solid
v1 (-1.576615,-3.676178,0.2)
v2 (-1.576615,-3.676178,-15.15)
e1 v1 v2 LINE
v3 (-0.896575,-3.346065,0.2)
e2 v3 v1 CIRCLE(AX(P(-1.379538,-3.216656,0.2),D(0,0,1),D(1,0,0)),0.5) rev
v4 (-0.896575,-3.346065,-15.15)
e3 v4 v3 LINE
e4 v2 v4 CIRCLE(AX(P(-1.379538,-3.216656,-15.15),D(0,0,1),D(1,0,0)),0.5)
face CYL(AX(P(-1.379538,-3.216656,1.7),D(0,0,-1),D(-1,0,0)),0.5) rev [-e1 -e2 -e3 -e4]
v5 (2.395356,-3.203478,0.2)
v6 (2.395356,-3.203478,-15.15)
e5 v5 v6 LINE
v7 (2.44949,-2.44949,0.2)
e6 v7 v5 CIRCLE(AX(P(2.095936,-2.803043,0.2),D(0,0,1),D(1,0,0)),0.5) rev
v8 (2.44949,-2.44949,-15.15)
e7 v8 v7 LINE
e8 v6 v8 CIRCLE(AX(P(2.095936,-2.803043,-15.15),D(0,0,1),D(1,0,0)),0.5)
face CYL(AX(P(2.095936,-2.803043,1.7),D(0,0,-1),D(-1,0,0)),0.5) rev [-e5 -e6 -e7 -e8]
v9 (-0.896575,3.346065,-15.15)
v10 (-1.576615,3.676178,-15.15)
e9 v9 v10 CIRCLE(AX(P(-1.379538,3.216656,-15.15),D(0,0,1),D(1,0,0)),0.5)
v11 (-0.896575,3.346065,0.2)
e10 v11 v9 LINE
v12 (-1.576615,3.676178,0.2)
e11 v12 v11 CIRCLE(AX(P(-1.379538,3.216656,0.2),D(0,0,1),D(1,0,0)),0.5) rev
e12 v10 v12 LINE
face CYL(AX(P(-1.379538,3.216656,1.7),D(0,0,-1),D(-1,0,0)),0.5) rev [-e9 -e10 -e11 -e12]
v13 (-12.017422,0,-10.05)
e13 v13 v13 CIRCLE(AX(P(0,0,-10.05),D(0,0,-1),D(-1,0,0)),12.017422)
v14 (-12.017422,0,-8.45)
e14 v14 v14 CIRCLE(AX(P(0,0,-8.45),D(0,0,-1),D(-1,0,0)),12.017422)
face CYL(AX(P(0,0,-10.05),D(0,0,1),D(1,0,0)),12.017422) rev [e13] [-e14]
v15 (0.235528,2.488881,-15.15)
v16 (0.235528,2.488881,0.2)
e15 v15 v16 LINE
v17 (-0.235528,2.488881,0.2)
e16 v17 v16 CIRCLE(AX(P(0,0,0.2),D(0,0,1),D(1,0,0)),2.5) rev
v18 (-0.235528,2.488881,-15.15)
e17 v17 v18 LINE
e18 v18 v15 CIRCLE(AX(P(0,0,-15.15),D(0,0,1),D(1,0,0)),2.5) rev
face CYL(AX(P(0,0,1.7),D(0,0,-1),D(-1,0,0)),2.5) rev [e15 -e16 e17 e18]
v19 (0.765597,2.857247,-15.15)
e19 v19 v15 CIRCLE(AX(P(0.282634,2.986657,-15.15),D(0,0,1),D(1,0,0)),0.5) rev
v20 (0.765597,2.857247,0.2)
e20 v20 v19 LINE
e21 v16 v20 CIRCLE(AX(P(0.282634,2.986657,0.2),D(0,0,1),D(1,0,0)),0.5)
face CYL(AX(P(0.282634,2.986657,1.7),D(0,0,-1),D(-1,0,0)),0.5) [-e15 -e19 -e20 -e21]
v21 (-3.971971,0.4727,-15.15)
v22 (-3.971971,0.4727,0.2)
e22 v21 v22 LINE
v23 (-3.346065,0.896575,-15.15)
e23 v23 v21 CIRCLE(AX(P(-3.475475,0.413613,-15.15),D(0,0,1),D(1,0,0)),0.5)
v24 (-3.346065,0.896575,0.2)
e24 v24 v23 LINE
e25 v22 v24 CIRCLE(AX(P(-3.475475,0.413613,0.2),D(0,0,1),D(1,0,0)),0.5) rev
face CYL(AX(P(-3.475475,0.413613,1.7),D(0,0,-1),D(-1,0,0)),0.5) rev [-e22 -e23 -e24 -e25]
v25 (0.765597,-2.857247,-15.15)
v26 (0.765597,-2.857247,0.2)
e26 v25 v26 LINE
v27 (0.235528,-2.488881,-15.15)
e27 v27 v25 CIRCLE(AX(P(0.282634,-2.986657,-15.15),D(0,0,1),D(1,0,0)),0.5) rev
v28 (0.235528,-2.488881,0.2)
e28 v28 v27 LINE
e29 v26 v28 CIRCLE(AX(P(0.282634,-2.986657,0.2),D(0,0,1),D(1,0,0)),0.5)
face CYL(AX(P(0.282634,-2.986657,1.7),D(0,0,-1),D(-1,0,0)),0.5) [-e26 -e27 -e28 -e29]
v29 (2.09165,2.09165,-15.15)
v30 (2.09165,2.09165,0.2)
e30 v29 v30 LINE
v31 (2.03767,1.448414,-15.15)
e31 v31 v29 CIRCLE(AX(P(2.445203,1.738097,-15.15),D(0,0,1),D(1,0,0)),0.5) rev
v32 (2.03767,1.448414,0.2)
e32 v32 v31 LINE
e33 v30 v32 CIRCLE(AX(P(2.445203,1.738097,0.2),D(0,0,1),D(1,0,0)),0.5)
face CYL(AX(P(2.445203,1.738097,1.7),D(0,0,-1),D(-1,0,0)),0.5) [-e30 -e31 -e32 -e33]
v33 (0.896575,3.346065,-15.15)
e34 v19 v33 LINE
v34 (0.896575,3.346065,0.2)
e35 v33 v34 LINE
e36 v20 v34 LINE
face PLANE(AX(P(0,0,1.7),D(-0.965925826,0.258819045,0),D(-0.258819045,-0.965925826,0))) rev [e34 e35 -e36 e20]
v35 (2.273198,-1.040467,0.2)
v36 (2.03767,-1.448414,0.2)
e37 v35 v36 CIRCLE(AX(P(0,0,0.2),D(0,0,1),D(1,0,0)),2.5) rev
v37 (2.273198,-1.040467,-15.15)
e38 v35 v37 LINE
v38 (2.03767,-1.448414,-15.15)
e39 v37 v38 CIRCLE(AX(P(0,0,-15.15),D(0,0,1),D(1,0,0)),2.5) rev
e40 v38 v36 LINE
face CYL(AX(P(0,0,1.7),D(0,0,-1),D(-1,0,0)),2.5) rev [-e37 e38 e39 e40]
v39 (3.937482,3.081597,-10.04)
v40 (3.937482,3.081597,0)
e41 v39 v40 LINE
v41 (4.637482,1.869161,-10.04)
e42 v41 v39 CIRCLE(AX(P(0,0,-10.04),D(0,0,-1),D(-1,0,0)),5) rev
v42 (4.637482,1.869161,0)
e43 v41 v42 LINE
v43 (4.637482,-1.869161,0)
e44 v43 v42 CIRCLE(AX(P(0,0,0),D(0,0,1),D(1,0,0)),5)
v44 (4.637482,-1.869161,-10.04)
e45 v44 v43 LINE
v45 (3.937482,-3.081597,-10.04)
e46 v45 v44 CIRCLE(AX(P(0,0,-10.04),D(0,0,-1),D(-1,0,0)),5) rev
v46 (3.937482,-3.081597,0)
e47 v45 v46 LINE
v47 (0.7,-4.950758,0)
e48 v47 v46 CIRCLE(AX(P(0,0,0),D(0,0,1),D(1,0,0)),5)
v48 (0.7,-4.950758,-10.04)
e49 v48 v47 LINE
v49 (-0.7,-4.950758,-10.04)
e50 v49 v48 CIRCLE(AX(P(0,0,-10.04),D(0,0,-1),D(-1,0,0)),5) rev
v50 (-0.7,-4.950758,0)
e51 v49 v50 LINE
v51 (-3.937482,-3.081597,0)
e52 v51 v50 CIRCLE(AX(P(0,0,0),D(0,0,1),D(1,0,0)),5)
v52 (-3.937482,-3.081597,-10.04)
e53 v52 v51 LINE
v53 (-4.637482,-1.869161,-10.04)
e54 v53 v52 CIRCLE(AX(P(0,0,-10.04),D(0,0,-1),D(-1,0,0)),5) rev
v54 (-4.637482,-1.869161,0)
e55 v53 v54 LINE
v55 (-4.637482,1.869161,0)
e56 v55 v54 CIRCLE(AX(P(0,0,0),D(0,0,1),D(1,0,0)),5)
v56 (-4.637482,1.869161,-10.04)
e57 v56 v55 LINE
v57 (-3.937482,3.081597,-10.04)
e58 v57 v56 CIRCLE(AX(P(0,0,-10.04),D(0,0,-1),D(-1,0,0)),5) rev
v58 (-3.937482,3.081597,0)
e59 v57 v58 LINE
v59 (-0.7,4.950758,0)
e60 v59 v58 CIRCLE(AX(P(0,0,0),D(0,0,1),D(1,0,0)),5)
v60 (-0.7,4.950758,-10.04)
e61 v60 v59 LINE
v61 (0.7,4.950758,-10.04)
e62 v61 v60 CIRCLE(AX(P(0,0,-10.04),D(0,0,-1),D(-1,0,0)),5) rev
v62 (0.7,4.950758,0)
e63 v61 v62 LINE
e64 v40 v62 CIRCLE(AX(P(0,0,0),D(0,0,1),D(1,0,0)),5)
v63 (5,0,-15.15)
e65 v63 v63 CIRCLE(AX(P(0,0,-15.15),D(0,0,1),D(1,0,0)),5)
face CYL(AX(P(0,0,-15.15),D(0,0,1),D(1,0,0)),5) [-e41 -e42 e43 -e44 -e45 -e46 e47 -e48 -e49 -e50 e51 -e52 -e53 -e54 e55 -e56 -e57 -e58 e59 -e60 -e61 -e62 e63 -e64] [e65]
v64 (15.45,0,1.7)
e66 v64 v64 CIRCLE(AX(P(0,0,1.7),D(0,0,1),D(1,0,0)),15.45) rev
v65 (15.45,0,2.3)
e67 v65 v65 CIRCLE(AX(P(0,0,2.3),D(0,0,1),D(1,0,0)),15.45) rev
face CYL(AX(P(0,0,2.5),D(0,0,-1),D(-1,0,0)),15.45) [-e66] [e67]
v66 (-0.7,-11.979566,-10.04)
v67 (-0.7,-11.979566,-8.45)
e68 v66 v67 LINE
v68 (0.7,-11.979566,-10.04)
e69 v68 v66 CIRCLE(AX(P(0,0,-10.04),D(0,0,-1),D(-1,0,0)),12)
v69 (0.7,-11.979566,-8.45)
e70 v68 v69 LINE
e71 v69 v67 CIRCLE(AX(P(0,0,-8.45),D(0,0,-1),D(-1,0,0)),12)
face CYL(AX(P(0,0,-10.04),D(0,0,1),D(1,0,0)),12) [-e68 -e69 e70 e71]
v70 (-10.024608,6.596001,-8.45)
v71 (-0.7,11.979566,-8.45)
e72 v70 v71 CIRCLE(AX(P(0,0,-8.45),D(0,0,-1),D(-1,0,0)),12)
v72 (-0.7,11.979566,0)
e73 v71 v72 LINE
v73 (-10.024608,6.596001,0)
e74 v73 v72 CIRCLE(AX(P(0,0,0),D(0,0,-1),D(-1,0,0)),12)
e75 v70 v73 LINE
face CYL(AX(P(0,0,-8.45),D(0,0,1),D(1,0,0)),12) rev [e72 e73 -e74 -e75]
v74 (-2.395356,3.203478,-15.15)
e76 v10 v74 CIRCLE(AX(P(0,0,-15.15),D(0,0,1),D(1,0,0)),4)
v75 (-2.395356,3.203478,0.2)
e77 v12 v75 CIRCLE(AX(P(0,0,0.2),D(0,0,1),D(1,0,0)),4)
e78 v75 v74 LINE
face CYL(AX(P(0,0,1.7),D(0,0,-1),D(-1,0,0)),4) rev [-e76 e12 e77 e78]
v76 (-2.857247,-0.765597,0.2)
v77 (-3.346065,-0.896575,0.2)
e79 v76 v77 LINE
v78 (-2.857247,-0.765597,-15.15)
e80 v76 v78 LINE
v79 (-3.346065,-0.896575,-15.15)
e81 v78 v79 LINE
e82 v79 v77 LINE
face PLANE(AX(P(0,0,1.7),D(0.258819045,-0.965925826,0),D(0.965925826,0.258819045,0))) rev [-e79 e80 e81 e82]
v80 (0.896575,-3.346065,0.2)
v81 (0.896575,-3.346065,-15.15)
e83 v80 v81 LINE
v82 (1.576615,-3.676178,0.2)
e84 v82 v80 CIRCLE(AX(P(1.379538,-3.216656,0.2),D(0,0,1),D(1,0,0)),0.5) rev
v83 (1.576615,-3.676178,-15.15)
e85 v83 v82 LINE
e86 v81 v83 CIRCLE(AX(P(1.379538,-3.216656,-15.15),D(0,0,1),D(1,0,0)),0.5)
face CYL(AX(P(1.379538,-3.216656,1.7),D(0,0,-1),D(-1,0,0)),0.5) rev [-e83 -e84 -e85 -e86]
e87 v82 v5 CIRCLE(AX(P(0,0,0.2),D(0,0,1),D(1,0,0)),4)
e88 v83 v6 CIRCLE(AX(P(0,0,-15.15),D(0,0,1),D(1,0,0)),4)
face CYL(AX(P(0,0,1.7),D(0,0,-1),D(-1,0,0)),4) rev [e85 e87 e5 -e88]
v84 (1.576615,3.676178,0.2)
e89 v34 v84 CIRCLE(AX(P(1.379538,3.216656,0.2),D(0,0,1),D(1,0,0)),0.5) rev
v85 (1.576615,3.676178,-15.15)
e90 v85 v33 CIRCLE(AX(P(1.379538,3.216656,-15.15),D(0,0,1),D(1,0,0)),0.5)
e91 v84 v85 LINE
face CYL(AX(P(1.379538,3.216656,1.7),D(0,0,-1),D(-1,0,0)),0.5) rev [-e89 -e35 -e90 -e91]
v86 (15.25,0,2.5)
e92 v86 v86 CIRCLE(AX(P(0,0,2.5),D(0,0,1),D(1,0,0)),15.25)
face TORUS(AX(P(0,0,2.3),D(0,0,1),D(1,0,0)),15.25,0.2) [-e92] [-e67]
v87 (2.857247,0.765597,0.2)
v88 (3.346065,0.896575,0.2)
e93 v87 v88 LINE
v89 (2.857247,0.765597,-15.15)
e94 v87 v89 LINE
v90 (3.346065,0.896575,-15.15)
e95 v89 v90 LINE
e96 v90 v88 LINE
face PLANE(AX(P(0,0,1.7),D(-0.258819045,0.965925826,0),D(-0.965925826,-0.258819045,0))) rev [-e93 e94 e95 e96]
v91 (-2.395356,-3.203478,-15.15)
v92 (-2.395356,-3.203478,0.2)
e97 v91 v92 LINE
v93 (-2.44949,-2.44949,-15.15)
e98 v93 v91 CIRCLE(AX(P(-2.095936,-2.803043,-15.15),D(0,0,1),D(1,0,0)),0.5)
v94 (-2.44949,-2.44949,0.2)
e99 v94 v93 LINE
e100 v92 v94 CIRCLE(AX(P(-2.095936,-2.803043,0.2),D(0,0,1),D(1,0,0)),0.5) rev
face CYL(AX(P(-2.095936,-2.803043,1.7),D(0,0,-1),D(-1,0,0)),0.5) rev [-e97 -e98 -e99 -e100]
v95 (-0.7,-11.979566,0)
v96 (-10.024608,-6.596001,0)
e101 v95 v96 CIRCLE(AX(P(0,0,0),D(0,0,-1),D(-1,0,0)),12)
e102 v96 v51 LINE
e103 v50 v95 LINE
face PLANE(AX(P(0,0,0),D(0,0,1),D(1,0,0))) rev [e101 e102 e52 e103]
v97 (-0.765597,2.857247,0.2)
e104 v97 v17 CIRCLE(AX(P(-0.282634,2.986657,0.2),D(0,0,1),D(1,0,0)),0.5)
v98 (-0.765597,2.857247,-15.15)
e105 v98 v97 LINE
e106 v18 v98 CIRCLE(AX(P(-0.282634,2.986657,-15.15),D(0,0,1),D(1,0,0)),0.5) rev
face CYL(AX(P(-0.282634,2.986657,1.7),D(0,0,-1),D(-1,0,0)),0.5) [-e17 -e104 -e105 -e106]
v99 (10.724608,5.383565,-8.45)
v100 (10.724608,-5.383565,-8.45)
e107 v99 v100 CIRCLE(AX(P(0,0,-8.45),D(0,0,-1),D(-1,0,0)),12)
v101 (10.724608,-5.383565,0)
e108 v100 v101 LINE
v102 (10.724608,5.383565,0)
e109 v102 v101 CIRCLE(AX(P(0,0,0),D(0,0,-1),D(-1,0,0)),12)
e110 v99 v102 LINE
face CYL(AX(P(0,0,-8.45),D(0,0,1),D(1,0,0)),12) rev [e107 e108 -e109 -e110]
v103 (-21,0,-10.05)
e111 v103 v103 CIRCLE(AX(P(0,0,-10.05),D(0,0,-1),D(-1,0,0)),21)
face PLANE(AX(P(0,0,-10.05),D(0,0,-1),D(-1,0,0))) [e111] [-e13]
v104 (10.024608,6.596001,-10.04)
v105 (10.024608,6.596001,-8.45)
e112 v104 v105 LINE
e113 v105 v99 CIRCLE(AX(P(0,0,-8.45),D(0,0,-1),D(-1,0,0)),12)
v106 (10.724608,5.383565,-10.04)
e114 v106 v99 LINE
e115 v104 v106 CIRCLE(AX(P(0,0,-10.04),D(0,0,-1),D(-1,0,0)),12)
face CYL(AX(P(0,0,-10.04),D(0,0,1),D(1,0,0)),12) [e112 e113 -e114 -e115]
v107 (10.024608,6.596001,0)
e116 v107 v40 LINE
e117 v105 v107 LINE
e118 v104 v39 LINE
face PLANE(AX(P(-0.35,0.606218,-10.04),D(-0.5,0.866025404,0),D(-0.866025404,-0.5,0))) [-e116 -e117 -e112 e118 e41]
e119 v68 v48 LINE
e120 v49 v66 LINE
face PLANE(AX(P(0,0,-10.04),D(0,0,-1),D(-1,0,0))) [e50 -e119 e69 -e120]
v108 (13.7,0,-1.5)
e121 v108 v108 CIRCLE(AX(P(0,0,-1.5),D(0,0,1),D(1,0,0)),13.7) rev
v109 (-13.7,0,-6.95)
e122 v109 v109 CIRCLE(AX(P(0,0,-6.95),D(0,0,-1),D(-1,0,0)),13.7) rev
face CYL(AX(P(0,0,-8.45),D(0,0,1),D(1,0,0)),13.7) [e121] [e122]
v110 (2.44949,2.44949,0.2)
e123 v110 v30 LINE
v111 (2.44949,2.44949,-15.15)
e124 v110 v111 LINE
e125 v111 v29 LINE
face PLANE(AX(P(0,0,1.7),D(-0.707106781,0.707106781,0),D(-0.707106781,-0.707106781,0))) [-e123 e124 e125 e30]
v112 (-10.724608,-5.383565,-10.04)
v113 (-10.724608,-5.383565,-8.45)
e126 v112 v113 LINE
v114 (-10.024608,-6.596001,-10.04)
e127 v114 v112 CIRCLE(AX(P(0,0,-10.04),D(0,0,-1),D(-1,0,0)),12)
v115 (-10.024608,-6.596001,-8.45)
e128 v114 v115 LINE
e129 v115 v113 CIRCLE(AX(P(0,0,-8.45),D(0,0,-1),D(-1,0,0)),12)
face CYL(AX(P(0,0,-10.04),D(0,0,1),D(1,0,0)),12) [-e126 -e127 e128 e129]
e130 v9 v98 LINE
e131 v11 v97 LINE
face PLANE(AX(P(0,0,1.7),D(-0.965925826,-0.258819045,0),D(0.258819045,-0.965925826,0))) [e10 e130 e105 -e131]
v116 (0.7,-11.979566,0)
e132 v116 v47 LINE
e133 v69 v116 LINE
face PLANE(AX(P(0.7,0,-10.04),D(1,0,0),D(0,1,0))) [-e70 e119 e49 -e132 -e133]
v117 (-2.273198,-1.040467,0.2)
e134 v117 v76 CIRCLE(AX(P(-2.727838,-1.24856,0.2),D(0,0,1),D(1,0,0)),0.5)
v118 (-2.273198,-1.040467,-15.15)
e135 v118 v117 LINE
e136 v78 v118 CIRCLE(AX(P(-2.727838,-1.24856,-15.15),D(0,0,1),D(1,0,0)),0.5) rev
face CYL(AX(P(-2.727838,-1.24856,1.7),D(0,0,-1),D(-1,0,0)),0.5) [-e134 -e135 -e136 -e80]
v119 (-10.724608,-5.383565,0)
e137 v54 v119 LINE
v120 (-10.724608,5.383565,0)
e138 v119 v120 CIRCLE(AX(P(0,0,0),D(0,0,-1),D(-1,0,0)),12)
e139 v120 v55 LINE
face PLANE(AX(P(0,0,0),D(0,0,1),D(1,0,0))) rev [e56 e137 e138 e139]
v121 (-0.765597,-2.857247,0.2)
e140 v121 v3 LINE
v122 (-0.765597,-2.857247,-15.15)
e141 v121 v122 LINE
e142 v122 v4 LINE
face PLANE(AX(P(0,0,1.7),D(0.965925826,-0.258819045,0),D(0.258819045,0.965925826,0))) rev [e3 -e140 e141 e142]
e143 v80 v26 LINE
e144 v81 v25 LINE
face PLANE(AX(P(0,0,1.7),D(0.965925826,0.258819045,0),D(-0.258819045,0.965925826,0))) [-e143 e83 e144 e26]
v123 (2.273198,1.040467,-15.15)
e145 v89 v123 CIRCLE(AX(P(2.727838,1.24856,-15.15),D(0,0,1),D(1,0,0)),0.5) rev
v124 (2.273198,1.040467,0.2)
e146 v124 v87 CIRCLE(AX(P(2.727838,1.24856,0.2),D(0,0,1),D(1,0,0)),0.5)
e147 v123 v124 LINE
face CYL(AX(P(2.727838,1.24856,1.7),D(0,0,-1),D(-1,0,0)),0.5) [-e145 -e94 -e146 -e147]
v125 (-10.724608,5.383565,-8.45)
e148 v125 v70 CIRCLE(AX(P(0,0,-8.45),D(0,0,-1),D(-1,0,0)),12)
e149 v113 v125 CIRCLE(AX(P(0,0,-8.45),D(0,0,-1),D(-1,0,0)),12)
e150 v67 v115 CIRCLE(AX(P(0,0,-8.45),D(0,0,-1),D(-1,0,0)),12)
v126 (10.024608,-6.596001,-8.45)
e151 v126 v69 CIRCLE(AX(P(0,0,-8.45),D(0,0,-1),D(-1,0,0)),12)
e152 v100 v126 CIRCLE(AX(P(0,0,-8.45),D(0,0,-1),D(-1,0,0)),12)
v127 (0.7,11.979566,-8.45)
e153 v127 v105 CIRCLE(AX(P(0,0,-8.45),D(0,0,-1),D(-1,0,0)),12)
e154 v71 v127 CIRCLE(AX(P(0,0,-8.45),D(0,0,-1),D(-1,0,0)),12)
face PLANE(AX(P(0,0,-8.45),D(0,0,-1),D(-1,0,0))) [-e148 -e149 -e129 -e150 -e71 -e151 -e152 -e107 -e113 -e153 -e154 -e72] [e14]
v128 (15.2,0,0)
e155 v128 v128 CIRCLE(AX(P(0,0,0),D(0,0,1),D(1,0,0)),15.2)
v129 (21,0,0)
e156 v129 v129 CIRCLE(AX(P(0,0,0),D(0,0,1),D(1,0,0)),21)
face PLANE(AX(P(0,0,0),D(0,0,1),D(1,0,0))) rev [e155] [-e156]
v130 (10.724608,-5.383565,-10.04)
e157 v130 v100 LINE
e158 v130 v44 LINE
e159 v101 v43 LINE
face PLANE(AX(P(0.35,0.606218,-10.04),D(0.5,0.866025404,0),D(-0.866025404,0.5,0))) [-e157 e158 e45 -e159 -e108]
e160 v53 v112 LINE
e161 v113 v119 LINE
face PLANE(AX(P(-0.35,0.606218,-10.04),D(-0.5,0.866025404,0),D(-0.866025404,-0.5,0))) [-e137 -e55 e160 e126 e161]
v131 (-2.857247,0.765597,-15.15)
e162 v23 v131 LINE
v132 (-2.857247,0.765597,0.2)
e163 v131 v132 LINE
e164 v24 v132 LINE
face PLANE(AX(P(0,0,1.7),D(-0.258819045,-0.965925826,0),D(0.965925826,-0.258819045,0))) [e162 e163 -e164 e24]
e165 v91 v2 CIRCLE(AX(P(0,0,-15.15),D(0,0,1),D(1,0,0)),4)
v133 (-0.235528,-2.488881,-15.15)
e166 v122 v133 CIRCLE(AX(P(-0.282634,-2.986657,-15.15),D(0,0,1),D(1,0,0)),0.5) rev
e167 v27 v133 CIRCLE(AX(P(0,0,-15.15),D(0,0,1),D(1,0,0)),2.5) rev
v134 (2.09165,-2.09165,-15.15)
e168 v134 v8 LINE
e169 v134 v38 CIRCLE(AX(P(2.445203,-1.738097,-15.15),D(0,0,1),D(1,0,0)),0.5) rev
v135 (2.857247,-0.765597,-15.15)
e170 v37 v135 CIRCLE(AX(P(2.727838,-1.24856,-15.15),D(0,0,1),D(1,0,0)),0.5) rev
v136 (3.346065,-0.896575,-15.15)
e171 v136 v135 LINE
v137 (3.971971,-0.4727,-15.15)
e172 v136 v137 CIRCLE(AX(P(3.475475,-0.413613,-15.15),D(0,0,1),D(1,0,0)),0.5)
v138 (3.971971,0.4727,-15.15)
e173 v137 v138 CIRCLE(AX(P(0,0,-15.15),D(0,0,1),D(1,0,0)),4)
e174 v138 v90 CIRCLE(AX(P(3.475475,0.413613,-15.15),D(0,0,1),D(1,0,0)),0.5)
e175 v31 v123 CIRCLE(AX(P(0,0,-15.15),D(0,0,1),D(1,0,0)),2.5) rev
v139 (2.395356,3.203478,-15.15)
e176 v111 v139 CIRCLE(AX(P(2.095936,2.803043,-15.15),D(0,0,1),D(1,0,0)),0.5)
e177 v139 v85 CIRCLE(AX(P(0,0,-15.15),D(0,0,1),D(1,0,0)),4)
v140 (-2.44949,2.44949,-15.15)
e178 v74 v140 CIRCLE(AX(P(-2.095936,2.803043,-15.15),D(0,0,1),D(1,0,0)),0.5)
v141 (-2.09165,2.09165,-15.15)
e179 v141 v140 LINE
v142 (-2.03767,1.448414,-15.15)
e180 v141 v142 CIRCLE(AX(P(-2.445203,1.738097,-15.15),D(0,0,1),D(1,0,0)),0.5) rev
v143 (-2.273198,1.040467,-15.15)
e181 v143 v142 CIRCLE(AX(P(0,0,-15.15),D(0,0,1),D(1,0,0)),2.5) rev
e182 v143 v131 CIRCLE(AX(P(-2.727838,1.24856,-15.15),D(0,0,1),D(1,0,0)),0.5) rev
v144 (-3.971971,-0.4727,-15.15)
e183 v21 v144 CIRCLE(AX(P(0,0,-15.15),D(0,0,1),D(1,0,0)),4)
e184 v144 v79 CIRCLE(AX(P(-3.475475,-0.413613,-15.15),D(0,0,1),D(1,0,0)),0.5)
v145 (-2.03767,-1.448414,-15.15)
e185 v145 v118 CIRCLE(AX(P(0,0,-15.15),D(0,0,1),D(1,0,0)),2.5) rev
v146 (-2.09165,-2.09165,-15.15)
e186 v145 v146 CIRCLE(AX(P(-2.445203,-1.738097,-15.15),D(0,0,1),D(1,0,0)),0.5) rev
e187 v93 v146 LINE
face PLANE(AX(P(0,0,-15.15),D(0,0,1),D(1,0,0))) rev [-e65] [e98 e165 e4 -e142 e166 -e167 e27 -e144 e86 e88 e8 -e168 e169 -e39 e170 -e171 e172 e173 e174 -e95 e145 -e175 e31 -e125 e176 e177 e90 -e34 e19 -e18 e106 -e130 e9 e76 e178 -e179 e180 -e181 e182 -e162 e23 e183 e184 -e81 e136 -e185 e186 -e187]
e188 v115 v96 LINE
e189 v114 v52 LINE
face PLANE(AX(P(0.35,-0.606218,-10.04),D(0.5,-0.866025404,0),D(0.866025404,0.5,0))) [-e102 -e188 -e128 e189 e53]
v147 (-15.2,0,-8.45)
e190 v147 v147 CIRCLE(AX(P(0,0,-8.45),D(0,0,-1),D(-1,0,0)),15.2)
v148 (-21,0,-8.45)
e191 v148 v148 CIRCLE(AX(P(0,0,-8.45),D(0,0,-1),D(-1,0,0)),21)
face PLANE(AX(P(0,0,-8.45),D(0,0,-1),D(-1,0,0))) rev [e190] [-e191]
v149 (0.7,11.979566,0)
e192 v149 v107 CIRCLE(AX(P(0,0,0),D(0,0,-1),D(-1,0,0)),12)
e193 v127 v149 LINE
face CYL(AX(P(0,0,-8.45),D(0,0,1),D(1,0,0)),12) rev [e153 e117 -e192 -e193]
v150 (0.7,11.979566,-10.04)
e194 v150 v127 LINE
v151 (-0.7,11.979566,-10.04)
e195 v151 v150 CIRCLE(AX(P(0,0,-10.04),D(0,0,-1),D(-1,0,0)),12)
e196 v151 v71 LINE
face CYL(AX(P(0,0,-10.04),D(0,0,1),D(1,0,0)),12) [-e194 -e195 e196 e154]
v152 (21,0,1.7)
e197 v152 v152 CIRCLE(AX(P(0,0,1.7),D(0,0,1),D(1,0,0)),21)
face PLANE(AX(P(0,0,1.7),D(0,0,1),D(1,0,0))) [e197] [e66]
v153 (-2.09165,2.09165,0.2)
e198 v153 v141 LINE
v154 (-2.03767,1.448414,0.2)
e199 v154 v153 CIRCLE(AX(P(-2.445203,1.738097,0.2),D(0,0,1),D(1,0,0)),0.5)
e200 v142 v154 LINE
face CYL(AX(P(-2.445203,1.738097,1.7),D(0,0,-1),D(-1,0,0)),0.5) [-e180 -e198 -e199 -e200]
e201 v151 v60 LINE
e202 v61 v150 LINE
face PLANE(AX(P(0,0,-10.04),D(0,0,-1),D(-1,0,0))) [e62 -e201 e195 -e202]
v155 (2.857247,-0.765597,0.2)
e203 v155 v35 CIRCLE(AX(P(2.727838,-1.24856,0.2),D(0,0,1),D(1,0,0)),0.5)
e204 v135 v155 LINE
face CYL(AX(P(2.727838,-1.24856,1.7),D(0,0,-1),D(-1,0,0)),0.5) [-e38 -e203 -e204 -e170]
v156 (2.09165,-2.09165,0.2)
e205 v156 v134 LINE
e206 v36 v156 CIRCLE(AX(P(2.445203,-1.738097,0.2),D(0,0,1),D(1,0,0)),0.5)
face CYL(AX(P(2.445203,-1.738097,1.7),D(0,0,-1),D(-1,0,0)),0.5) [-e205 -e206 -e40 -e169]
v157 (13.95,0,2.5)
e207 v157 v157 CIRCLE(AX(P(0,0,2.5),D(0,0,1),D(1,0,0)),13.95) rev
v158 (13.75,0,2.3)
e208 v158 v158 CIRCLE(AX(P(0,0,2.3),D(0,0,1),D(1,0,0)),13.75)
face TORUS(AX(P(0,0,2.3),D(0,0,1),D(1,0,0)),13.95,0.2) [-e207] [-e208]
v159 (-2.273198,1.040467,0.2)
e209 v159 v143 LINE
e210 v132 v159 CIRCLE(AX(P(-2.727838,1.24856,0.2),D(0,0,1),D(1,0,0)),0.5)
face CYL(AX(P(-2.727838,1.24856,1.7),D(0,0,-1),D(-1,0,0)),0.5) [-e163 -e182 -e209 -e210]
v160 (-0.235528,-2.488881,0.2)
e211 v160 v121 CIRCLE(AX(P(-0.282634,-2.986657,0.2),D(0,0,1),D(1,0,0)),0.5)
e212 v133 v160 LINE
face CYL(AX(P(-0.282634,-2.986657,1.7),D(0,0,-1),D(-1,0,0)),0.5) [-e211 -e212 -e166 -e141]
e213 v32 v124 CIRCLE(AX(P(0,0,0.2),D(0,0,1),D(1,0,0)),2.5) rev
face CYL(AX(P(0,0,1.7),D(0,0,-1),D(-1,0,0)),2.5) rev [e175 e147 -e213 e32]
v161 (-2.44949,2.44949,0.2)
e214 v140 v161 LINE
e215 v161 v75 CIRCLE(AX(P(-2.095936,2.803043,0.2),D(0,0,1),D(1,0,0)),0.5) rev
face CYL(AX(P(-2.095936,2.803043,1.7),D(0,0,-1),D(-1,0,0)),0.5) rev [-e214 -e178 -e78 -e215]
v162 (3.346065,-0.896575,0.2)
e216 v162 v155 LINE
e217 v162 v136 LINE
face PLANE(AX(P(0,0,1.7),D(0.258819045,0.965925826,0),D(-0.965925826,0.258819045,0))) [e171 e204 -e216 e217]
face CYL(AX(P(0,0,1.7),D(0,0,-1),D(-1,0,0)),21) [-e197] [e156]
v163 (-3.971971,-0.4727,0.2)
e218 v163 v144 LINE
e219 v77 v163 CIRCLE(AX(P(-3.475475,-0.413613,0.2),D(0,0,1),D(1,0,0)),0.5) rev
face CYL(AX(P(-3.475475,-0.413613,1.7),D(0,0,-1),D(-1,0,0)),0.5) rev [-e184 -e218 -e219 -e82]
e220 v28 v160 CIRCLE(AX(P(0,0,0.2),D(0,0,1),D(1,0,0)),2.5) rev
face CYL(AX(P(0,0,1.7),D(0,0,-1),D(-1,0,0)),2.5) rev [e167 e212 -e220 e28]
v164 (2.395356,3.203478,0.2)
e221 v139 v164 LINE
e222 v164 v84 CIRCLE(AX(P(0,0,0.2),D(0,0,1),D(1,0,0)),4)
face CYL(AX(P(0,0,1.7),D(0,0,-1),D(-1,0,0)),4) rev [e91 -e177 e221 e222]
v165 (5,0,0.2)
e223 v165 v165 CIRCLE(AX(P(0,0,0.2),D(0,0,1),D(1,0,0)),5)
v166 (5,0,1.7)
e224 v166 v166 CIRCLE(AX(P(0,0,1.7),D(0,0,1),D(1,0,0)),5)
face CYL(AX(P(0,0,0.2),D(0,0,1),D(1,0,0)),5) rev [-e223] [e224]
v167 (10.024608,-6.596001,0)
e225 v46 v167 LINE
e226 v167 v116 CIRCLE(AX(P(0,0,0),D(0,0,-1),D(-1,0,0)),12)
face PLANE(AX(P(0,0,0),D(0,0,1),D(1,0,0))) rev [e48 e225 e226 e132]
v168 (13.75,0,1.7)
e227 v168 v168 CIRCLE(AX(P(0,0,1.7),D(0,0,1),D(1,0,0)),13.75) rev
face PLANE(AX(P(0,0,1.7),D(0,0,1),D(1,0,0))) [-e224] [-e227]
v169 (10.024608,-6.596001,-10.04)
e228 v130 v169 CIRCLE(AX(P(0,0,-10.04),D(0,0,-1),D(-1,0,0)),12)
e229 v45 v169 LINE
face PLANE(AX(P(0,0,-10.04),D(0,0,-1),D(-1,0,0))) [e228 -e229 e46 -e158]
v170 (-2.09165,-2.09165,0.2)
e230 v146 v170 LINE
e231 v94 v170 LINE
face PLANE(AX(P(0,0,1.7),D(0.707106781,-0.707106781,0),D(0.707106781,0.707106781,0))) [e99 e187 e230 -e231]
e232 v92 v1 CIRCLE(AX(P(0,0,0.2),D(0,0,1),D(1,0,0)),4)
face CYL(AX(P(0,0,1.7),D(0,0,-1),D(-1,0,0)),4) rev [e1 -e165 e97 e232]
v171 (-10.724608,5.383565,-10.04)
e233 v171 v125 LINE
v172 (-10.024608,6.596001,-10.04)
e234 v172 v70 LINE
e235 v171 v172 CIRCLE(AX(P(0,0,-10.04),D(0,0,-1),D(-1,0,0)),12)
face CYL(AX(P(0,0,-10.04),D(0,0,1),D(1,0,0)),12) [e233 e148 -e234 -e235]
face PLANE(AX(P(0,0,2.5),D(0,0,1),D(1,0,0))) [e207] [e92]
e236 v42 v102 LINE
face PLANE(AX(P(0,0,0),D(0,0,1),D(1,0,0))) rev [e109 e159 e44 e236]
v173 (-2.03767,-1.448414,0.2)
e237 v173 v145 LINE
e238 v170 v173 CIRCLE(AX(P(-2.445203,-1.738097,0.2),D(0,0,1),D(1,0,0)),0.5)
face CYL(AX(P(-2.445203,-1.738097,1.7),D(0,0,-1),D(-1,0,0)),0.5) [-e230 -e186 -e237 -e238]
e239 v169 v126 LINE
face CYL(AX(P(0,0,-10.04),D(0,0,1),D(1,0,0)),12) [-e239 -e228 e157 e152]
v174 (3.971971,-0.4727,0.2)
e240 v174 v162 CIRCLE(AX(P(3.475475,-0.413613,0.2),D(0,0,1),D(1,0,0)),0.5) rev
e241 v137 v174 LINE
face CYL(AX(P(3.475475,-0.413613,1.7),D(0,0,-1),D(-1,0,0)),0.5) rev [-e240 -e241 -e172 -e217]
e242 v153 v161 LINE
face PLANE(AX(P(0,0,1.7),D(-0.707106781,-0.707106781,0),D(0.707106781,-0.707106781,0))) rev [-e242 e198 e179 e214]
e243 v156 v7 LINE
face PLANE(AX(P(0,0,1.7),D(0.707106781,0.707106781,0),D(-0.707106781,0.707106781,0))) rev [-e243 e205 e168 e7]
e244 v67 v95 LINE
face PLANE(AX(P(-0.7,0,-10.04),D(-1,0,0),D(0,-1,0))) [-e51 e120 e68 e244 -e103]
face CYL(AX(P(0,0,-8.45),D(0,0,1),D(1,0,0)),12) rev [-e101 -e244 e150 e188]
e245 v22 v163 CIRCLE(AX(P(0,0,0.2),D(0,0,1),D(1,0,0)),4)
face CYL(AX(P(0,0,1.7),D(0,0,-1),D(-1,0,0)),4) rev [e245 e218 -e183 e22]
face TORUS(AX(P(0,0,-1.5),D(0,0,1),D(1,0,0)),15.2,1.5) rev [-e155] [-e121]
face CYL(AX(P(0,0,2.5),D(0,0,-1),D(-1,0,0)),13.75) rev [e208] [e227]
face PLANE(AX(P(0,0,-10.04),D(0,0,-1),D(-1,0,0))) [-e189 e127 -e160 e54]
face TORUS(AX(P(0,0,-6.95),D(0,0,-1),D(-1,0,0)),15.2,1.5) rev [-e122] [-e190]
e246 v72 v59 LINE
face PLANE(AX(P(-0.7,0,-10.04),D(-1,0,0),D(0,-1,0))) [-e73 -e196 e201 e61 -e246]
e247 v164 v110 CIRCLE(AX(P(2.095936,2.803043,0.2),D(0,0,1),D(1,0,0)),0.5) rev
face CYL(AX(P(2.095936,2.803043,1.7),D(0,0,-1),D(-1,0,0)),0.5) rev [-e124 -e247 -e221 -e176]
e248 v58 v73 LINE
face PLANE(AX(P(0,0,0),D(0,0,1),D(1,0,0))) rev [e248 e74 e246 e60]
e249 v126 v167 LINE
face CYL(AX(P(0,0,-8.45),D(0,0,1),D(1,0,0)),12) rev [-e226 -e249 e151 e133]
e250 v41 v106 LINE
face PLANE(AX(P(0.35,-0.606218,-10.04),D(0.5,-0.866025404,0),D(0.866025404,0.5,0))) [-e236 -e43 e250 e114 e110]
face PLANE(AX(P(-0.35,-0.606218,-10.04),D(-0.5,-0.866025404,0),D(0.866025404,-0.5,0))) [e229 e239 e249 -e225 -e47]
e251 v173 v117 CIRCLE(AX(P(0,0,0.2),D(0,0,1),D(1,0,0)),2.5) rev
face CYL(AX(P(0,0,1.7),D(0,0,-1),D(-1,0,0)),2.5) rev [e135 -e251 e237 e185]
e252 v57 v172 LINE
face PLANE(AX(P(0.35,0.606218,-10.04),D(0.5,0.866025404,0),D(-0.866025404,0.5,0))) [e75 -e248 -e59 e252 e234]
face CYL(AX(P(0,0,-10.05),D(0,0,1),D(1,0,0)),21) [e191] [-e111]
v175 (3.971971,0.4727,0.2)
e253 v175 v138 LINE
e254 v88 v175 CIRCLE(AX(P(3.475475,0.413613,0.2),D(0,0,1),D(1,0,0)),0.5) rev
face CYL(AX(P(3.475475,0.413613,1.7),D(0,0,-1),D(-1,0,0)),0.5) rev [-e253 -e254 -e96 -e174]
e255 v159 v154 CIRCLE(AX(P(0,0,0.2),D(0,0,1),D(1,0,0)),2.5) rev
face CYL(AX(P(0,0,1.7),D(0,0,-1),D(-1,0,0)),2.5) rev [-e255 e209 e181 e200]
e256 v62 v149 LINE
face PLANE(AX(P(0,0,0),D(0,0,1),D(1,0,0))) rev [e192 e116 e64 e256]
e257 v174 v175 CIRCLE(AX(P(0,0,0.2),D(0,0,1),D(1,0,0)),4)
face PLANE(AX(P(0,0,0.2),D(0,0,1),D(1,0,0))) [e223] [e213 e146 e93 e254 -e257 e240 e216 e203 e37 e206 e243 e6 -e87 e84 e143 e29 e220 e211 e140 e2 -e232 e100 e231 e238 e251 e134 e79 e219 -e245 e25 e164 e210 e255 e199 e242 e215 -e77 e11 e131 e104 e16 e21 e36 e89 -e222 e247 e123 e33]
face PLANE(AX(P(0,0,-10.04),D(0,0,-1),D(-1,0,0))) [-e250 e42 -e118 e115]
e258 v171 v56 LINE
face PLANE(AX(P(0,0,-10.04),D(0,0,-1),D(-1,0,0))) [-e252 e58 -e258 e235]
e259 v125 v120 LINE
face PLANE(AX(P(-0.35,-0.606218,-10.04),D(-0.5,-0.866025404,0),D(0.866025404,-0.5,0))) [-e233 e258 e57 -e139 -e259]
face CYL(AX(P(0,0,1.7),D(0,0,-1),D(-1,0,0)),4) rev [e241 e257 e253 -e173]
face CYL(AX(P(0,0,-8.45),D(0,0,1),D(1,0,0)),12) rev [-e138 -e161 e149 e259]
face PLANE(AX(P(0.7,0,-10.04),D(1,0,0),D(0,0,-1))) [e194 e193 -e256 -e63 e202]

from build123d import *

# Parameters (mm, degrees)
SKETCH1_R           = 21
BOSS_EXTRUDE1_DEPTH = 1.7
SKETCH1_7_R         = 15.45
SKETCH1_7_R_2       = 13.75
BOSS_EXTRUDE2_DEPTH = 0.75
SKETCH3_R           = 13.7
SKETCH3_R_2         = 12
BOSS_EXTRUDE3_DEPTH = 8.45
BOSS_EXTRUDE5_START = 1.6
SKETCH6_R           = 21
SKETCH6_R_2         = 12.017421607
BOSS_EXTRUDE5_DEPTH = 1.6
BOSS_EXTRUDE6_START = -16.85
SKETCH7_R           = 5
BOSS_EXTRUDE6_DEPTH = 16.85
BOSS_EXTRUDE7_DEPTH = 10.04
CUT_EXTRUDE1_START  = -1.5
SKETCH9_R           = 5
CUT_EXTRUDE1_DEPTH  = 1.5
FILLET2_R           = 0.5
FILLET3_R           = 1.5
SKETCH1_9_R         = 15.45
SKETCH1_9_R_2       = 13.75
BOSS_EXTRUDE8_DEPTH = 2.5
FILLET4_R           = 0.2


with BuildPart() as part:
    # Sketch1 → Boss-Extrude1 (new body)
    with BuildSketch(Plane.XY):
        Circle(SKETCH1_R)
        with BuildLine():
            ThreePointArc((-0.647047613, 2.414814566), (0, 2.5), (0.647047613, 2.414814566))
            Line((0.647047613, 2.414814566), (1.03527618, 3.863703305))
            ThreePointArc((1.03527618, 3.863703305), (2, 3.464101615), (2.828427125, 2.828427125))
            Line((2.828427125, 2.828427125), (1.767766953, 1.767766953))
            ThreePointArc((1.767766953, 1.767766953), (2.165063509, 1.25), (2.414814566, 0.647047613))
            Line((2.414814566, 0.647047613), (3.863703305, 1.03527618))
            ThreePointArc((3.863703305, 1.03527618), (4, 0), (3.863703305, -1.03527618))
            Line((3.863703305, -1.03527618), (2.414814566, -0.647047613))
            ThreePointArc((2.414814566, -0.647047613), (2.165063509, -1.25), (1.767766953, -1.767766953))
            Line((1.767766953, -1.767766953), (2.828427125, -2.828427125))
            ThreePointArc((2.828427125, -2.828427125), (2, -3.464101615), (1.03527618, -3.863703305))
            Line((1.03527618, -3.863703305), (0.647047613, -2.414814566))
            ThreePointArc((0.647047613, -2.414814566), (0, -2.5), (-0.647047613, -2.414814566))
            Line((-0.647047613, -2.414814566), (-1.03527618, -3.863703305))
            ThreePointArc((-1.03527618, -3.863703305), (-2, -3.464101615), (-2.828427125, -2.828427125))
            Line((-2.828427125, -2.828427125), (-1.767766953, -1.767766953))
            ThreePointArc((-1.767766953, -1.767766953), (-2.165063509, -1.25), (-2.414814566, -0.647047613))
            Line((-2.414814566, -0.647047613), (-3.863703305, -1.03527618))
            ThreePointArc((-3.863703305, -1.03527618), (-4, 0), (-3.863703305, 1.03527618))
            Line((-3.863703305, 1.03527618), (-2.414814566, 0.647047613))
            ThreePointArc((-2.414814566, 0.647047613), (-2.165063509, 1.25), (-1.767766953, 1.767766953))
            Line((-1.767766953, 1.767766953), (-2.828427125, 2.828427125))
            ThreePointArc((-2.828427125, 2.828427125), (-2, 3.464101615), (-1.03527618, 3.863703305))
            Line((-1.03527618, 3.863703305), (-0.647047613, 2.414814566))
        make_face(mode=Mode.SUBTRACT)
    extrude(amount=BOSS_EXTRUDE1_DEPTH)

    # Sketch1<7> → Boss-Extrude2 (add)
    with BuildSketch(Plane.XY):
        Circle(SKETCH1_7_R)
        Circle(SKETCH1_7_R_2, mode=Mode.SUBTRACT)
    extrude(amount=BOSS_EXTRUDE2_DEPTH)

    # Sketch3 → Boss-Extrude3 (add)
    with BuildSketch(Plane(origin=(0, 0, 0), x_dir=(-1, 0, 0), z_dir=(0, 0, -1))):
        Circle(SKETCH3_R)
        Circle(SKETCH3_R_2, mode=Mode.SUBTRACT)
    extrude(amount=BOSS_EXTRUDE3_DEPTH)

    # Sketch6 → Boss-Extrude5 (add)
    with BuildSketch(Plane(origin=(0, 0, -8.45), x_dir=(-1, 0, 0), z_dir=(0, 0, -1)).offset(BOSS_EXTRUDE5_START)):
        Circle(SKETCH6_R)
        Circle(SKETCH6_R_2, mode=Mode.SUBTRACT)
    extrude(amount=-BOSS_EXTRUDE5_DEPTH)

    # Sketch7 → Boss-Extrude6 (add)
    with BuildSketch(Plane.XY.offset(1.7).offset(BOSS_EXTRUDE6_START)):
        Circle(SKETCH7_R)
        with BuildLine():
            ThreePointArc((-0.647047613, 2.414814566), (0, 2.5), (0.647047613, 2.414814566))
            Line((0.647047613, 2.414814566), (1.03527618, 3.863703305))
            ThreePointArc((1.03527618, 3.863703305), (2, 3.464101615), (2.828427125, 2.828427125))
            Line((2.828427125, 2.828427125), (1.767766953, 1.767766953))
            ThreePointArc((1.767766953, 1.767766953), (2.165063509, 1.25), (2.414814566, 0.647047613))
            Line((2.414814566, 0.647047613), (3.863703305, 1.03527618))
            ThreePointArc((3.863703305, 1.03527618), (4, 0), (3.863703305, -1.03527618))
            Line((3.863703305, -1.03527618), (2.414814566, -0.647047613))
            ThreePointArc((2.414814566, -0.647047613), (2.165063509, -1.25), (1.767766953, -1.767766953))
            Line((1.767766953, -1.767766953), (2.828427125, -2.828427125))
            ThreePointArc((2.828427125, -2.828427125), (2, -3.464101615), (1.03527618, -3.863703305))
            Line((1.03527618, -3.863703305), (0.647047613, -2.414814566))
            ThreePointArc((0.647047613, -2.414814566), (0, -2.5), (-0.647047613, -2.414814566))
            Line((-0.647047613, -2.414814566), (-1.03527618, -3.863703305))
            ThreePointArc((-1.03527618, -3.863703305), (-2, -3.464101615), (-2.828427125, -2.828427125))
            Line((-2.828427125, -2.828427125), (-1.767766953, -1.767766953))
            ThreePointArc((-1.767766953, -1.767766953), (-2.165063509, -1.25), (-2.414814566, -0.647047613))
            Line((-2.414814566, -0.647047613), (-3.863703305, -1.03527618))
            ThreePointArc((-3.863703305, -1.03527618), (-4, 0), (-3.863703305, 1.03527618))
            Line((-3.863703305, 1.03527618), (-2.414814566, 0.647047613))
            ThreePointArc((-2.414814566, 0.647047613), (-2.165063509, 1.25), (-1.767766953, 1.767766953))
            Line((-1.767766953, 1.767766953), (-2.828427125, 2.828427125))
            ThreePointArc((-2.828427125, 2.828427125), (-2, 3.464101615), (-1.03527618, 3.863703305))
            Line((-1.03527618, 3.863703305), (-0.647047613, 2.414814566))
        make_face(mode=Mode.SUBTRACT)
    extrude(amount=BOSS_EXTRUDE6_DEPTH)

    # Sketch8 → Boss-Extrude7 (add)
    with BuildSketch(Plane(origin=(0, 0, 0), x_dir=(-1, 0, 0), z_dir=(0, 0, -1))):
        with BuildLine():
            Line((-0.7, 11.979565935), (-0.7, 4.950757518))
            ThreePointArc((-0.7, 4.950757518), (0, 5), (0.7, 4.950757518))
            Line((0.7, 4.950757518), (0.7, 11.979565935))
            ThreePointArc((0.7, 11.979565935), (0, 12), (-0.7, 11.979565935))
        make_face()
        with BuildLine():
            Line((-3.937481778, 3.081596542), (-10.024608426, 6.59600075))
            ThreePointArc((-10.024608426, 6.59600075), (-10.392304845, 6), (-10.724608426, 5.383565185))
            Line((-10.724608426, 5.383565185), (-4.637481778, 1.869160976))
            ThreePointArc((-4.637481778, 1.869160976), (-4.330127019, 2.5), (-3.937481778, 3.081596542))
        make_face()
        with BuildLine():
            ThreePointArc((10.724608426, 5.383565185), (10.392304845, 6), (10.024608426, 6.59600075))
            Line((10.024608426, 6.59600075), (3.937481778, 3.081596542))
            ThreePointArc((3.937481778, 3.081596542), (4.330127019, 2.5), (4.637481778, 1.869160976))
            Line((4.637481778, 1.869160976), (10.724608426, 5.383565185))
        make_face()
        with BuildLine():
            Line((-4.637481778, -1.869160976), (-10.724608426, -5.383565185))
            ThreePointArc((-10.724608426, -5.383565185), (-10.392304845, -6), (-10.024608426, -6.59600075))
            Line((-10.024608426, -6.59600075), (-3.937481778, -3.081596542))
            ThreePointArc((-3.937481778, -3.081596542), (-4.330127019, -2.5), (-4.637481778, -1.869160976))
        make_face()
        with BuildLine():
            ThreePointArc((10.024608426, -6.59600075), (10.392304845, -6), (10.724608426, -5.383565185))
            Line((10.724608426, -5.383565185), (4.637481778, -1.869160976))
            ThreePointArc((4.637481778, -1.869160976), (4.330127019, -2.5), (3.937481778, -3.081596542))
            Line((3.937481778, -3.081596542), (10.024608426, -6.59600075))
        make_face()
        with BuildLine():
            Line((-0.7, -4.950757518), (-0.7, -11.979565935))
            ThreePointArc((-0.7, -11.979565935), (0, -12), (0.7, -11.979565935))
            Line((0.7, -11.979565935), (0.7, -4.950757518))
            ThreePointArc((0.7, -4.950757518), (0, -5), (-0.7, -4.950757518))
        make_face()
    extrude(amount=BOSS_EXTRUDE7_DEPTH)

    # Sketch9 → Cut-Extrude1 (cut)
    with BuildSketch(Plane.XY.offset(1.7).offset(CUT_EXTRUDE1_START)):
        Circle(SKETCH9_R)
        with BuildLine():
            ThreePointArc((-0.647047613, 2.414814566), (0, 2.5), (0.647047613, 2.414814566))
            Line((0.647047613, 2.414814566), (1.03527618, 3.863703305))
            ThreePointArc((1.03527618, 3.863703305), (2, 3.464101615), (2.828427125, 2.828427125))
            Line((2.828427125, 2.828427125), (1.767766953, 1.767766953))
            ThreePointArc((1.767766953, 1.767766953), (2.165063509, 1.25), (2.414814566, 0.647047613))
            Line((2.414814566, 0.647047613), (3.863703305, 1.03527618))
            ThreePointArc((3.863703305, 1.03527618), (4, 0), (3.863703305, -1.03527618))
            Line((3.863703305, -1.03527618), (2.414814566, -0.647047613))
            ThreePointArc((2.414814566, -0.647047613), (2.165063509, -1.25), (1.767766953, -1.767766953))
            Line((1.767766953, -1.767766953), (2.828427125, -2.828427125))
            ThreePointArc((2.828427125, -2.828427125), (2, -3.464101615), (1.03527618, -3.863703305))
            Line((1.03527618, -3.863703305), (0.647047613, -2.414814566))
            ThreePointArc((0.647047613, -2.414814566), (0, -2.5), (-0.647047613, -2.414814566))
            Line((-0.647047613, -2.414814566), (-1.03527618, -3.863703305))
            ThreePointArc((-1.03527618, -3.863703305), (-2, -3.464101615), (-2.828427125, -2.828427125))
            Line((-2.828427125, -2.828427125), (-1.767766953, -1.767766953))
            ThreePointArc((-1.767766953, -1.767766953), (-2.165063509, -1.25), (-2.414814566, -0.647047613))
            Line((-2.414814566, -0.647047613), (-3.863703305, -1.03527618))
            ThreePointArc((-3.863703305, -1.03527618), (-4, 0), (-3.863703305, 1.03527618))
            Line((-3.863703305, 1.03527618), (-2.414814566, 0.647047613))
            ThreePointArc((-2.414814566, 0.647047613), (-2.165063509, 1.25), (-1.767766953, 1.767766953))
            Line((-1.767766953, 1.767766953), (-2.828427125, 2.828427125))
            ThreePointArc((-2.828427125, 2.828427125), (-2, 3.464101615), (-1.03527618, 3.863703305))
            Line((-1.03527618, 3.863703305), (-0.647047613, 2.414814566))
        make_face(mode=Mode.SUBTRACT)
    extrude(amount=CUT_EXTRUDE1_DEPTH, mode=Mode.SUBTRACT)

    # Fillet2
    fillet2_edges = [part.edges().sort_by_distance(p)[0] for p in [
        (3.863703305, -1.03527618, -7.475),
        (-3.863703305, 1.03527618, -7.475),
        (3.863703305, 1.03527618, -7.475),
        (-3.863703305, -1.03527618, -7.475),
        (2.828427125, 2.828427125, -7.475),
        (-2.828427125, -2.828427125, -7.475),
        (1.767766953, 1.767766953, -7.475),
        (-1.767766953, -1.767766953, -7.475),
        (2.414814566, 0.647047613, -7.475),
        (-2.414814566, -0.647047613, -7.475),
        (1.767766953, -1.767766953, -7.475),
        (-1.767766953, 1.767766953, -7.475),
        (2.828427125, -2.828427125, -7.475),
        (-2.828427125, 2.828427125, -7.475),
        (1.03527618, -3.863703305, -7.475),
        (-1.03527618, 3.863703305, -7.475),
        (2.414814566, -0.647047613, -7.475),
        (-2.414814566, 0.647047613, -7.475),
        (0.647047613, -2.414814566, -7.475),
        (-0.647047613, 2.414814566, -7.475),
        (0.647047613, 2.414814566, -7.475),
        (-0.647047613, -2.414814566, -7.475),
        (1.03527618, 3.863703305, -7.475),
        (-1.03527618, -3.863703305, -7.475),
    ]]
    fillet(fillet2_edges, radius=FILLET2_R)

    # Fillet3
    fillet3_edges = [part.edges().sort_by_distance(p)[0] for p in [
        (13.7, 0, -8.45),
        (13.7, 0, 0),
    ]]
    fillet(fillet3_edges, radius=FILLET3_R)

    # Sketch1<9> → Boss-Extrude8 (add)
    with BuildSketch(Plane.XY):
        Circle(SKETCH1_9_R)
        Circle(SKETCH1_9_R_2, mode=Mode.SUBTRACT)
    extrude(amount=BOSS_EXTRUDE8_DEPTH)

    # Fillet4
    fillet4_edges = [part.edges().sort_by_distance(p)[0] for p in [
        (-13.75, 0, 2.5),
        (-15.45, 0, 2.5),
    ]]
    fillet(fillet4_edges, radius=FILLET4_R)


solid = part.part
